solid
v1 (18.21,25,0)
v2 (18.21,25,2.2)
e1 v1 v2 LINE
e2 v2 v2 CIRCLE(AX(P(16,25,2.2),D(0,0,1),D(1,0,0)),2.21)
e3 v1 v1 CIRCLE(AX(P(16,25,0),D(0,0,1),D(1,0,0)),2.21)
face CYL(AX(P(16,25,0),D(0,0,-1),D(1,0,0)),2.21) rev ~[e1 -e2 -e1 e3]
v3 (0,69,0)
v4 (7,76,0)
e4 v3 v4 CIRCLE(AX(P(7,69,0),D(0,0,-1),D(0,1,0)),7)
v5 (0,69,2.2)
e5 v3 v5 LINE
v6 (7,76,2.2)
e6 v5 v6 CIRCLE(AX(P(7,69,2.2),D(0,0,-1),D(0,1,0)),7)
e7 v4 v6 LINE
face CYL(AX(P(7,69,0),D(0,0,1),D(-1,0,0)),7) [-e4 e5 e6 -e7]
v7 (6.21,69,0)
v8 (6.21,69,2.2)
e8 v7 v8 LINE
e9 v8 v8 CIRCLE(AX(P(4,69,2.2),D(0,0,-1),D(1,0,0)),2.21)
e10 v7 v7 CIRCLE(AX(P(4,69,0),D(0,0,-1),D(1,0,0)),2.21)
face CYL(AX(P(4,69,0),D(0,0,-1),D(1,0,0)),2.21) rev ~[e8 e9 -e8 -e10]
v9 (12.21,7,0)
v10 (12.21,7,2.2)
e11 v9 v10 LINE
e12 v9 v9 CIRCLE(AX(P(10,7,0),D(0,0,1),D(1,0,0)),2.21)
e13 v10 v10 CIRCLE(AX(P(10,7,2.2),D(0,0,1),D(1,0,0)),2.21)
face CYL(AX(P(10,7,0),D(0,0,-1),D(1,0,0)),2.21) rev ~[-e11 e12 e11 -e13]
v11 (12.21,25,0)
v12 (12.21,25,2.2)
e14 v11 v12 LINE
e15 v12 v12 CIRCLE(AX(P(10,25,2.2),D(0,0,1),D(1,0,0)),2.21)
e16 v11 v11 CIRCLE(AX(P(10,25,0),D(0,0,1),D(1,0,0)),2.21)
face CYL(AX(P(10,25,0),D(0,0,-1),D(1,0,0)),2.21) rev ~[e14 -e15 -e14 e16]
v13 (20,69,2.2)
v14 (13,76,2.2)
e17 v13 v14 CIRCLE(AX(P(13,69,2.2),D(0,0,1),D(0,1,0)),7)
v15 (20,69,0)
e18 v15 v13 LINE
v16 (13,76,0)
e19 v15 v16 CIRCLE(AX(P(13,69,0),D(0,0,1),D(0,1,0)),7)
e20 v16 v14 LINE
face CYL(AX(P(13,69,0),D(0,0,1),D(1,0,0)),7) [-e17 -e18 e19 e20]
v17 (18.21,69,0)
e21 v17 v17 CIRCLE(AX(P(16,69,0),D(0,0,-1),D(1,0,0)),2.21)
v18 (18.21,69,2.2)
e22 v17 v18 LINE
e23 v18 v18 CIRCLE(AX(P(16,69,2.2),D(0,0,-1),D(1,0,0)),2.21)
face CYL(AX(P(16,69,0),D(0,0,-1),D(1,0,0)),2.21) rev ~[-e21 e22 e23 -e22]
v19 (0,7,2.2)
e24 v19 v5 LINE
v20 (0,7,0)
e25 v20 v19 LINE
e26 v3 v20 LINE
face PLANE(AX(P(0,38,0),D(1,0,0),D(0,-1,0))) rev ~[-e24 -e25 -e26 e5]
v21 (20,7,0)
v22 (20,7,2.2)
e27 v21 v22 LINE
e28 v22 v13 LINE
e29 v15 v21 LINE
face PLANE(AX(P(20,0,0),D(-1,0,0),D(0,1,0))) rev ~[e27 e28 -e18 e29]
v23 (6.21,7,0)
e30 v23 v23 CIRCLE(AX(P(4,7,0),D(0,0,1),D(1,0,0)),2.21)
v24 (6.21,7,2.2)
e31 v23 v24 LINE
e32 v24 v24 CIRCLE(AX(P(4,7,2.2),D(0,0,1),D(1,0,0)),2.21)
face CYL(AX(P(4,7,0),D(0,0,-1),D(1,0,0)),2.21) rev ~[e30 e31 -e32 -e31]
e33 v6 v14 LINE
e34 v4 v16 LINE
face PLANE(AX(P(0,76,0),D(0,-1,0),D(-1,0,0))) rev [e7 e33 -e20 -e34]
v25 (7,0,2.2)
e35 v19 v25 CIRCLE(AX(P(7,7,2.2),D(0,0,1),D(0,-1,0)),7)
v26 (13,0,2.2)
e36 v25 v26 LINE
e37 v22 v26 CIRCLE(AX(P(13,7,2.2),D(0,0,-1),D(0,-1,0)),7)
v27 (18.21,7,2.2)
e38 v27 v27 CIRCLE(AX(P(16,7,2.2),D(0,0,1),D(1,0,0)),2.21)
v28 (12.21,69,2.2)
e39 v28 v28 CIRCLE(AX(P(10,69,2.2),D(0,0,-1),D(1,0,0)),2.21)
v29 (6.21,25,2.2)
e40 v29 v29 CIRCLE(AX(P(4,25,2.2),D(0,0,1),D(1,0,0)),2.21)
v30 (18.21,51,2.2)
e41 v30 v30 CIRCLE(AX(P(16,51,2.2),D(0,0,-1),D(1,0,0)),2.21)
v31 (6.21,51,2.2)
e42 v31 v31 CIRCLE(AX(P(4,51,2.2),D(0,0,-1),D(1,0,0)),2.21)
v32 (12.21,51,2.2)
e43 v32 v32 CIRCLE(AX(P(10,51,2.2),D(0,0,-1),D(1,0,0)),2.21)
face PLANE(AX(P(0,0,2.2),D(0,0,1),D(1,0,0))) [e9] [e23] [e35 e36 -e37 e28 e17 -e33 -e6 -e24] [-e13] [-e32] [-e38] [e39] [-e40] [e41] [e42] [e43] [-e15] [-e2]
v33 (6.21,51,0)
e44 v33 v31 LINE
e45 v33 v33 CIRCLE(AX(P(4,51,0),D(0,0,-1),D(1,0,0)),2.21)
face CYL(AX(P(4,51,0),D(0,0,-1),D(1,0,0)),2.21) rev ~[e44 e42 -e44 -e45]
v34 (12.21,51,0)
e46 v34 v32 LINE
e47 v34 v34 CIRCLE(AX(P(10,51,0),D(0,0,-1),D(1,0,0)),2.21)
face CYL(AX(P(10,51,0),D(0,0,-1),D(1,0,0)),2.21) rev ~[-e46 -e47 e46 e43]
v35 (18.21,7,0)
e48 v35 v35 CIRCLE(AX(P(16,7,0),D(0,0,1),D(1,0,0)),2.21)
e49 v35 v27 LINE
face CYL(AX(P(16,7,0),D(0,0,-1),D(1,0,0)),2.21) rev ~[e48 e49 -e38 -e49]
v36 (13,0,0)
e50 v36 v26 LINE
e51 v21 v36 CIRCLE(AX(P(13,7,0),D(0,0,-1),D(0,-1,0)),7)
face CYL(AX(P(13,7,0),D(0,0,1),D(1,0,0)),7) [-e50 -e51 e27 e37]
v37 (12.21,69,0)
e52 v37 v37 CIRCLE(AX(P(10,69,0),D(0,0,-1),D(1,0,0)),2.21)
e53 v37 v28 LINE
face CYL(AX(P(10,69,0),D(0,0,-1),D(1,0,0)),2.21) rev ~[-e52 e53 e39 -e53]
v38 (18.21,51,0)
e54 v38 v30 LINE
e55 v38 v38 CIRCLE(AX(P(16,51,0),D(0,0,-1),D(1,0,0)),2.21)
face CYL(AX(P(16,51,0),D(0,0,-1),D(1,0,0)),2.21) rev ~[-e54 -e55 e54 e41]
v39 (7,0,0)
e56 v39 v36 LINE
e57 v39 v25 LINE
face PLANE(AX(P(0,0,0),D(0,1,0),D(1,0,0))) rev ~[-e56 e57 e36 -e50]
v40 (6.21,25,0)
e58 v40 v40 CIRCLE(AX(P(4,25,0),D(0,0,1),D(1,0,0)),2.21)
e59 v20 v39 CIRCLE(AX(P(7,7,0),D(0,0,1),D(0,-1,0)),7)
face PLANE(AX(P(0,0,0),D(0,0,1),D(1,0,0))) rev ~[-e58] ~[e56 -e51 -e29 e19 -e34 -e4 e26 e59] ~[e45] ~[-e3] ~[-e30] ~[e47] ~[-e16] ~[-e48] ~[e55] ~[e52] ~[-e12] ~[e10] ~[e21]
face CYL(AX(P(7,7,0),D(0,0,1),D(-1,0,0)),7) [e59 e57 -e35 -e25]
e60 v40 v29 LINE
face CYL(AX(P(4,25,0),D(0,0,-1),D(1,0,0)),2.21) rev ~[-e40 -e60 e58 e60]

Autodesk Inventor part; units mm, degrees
ref_plane "YZ Plane" through (0, 0, 0) normal (1, 0, 0) x (0, 1, 0)
ref_plane "XZ Plane" through (0, 0, 0) normal (0, 1, 0) x (-1, 0, 0)
ref_plane "XY Plane" through (0, 0, 0) normal (0, 0, 1) x (1, 0, 0)
sketch "Esquisse12" plane through (0, 0, 0) normal (0, 0, 1) x (1, 0, 0)
  line L0 (0, 0) -> (20, 0)
  line L1 (20, 0) -> (20, 38)
  line L2 (20, 38) -> (0, 38)
  line L3 (0, 38) -> (0, 0)
  line L4 (10, 38) -> (10, 0) construction
  circle A0 centre (10, 7) radius 2.21
  line L5 (10, 7) -> (20, 7) construction
  circle A1 centre (16, 7) radius 2.21
  circle A2 centre (4, 7) radius 2.21
  circle A3 centre (10, 7) radius 2.21
  circle A4 centre (10, 25) radius 2.21
  circle A5 centre (16, 25) radius 2.21
  circle A6 centre (4, 25) radius 2.21
  dimension "d133" = 20
  dimension "d134" = 7
  dimension "d135" = 4.42
  dimension "d138" = 6
  dimension "d141" = 6
  dimension "d148" = 18
  dimension "d153" = 13
extrude "Extrusion13" add sketch "Esquisse12" along normal blind 2.2
fillet "Congé8" radius 7 2 edges at (20, 0, 1.1) (0, 0, 1.1)
mirror "Symétrie3" about plane through (20, 38, 0) normal (0, 1, 0)
equation "\"d135\" = Holes"
equation "\"d154\" = Depth"
equation "\"d156\" = Rounding"
equation "\"Depth\" = 2.2"
equation "\"Holes\" = 4.42"
equation "\"Height\" = 0"
equation "\"Rounding\" = 7"
properties part number "SideToSide"
